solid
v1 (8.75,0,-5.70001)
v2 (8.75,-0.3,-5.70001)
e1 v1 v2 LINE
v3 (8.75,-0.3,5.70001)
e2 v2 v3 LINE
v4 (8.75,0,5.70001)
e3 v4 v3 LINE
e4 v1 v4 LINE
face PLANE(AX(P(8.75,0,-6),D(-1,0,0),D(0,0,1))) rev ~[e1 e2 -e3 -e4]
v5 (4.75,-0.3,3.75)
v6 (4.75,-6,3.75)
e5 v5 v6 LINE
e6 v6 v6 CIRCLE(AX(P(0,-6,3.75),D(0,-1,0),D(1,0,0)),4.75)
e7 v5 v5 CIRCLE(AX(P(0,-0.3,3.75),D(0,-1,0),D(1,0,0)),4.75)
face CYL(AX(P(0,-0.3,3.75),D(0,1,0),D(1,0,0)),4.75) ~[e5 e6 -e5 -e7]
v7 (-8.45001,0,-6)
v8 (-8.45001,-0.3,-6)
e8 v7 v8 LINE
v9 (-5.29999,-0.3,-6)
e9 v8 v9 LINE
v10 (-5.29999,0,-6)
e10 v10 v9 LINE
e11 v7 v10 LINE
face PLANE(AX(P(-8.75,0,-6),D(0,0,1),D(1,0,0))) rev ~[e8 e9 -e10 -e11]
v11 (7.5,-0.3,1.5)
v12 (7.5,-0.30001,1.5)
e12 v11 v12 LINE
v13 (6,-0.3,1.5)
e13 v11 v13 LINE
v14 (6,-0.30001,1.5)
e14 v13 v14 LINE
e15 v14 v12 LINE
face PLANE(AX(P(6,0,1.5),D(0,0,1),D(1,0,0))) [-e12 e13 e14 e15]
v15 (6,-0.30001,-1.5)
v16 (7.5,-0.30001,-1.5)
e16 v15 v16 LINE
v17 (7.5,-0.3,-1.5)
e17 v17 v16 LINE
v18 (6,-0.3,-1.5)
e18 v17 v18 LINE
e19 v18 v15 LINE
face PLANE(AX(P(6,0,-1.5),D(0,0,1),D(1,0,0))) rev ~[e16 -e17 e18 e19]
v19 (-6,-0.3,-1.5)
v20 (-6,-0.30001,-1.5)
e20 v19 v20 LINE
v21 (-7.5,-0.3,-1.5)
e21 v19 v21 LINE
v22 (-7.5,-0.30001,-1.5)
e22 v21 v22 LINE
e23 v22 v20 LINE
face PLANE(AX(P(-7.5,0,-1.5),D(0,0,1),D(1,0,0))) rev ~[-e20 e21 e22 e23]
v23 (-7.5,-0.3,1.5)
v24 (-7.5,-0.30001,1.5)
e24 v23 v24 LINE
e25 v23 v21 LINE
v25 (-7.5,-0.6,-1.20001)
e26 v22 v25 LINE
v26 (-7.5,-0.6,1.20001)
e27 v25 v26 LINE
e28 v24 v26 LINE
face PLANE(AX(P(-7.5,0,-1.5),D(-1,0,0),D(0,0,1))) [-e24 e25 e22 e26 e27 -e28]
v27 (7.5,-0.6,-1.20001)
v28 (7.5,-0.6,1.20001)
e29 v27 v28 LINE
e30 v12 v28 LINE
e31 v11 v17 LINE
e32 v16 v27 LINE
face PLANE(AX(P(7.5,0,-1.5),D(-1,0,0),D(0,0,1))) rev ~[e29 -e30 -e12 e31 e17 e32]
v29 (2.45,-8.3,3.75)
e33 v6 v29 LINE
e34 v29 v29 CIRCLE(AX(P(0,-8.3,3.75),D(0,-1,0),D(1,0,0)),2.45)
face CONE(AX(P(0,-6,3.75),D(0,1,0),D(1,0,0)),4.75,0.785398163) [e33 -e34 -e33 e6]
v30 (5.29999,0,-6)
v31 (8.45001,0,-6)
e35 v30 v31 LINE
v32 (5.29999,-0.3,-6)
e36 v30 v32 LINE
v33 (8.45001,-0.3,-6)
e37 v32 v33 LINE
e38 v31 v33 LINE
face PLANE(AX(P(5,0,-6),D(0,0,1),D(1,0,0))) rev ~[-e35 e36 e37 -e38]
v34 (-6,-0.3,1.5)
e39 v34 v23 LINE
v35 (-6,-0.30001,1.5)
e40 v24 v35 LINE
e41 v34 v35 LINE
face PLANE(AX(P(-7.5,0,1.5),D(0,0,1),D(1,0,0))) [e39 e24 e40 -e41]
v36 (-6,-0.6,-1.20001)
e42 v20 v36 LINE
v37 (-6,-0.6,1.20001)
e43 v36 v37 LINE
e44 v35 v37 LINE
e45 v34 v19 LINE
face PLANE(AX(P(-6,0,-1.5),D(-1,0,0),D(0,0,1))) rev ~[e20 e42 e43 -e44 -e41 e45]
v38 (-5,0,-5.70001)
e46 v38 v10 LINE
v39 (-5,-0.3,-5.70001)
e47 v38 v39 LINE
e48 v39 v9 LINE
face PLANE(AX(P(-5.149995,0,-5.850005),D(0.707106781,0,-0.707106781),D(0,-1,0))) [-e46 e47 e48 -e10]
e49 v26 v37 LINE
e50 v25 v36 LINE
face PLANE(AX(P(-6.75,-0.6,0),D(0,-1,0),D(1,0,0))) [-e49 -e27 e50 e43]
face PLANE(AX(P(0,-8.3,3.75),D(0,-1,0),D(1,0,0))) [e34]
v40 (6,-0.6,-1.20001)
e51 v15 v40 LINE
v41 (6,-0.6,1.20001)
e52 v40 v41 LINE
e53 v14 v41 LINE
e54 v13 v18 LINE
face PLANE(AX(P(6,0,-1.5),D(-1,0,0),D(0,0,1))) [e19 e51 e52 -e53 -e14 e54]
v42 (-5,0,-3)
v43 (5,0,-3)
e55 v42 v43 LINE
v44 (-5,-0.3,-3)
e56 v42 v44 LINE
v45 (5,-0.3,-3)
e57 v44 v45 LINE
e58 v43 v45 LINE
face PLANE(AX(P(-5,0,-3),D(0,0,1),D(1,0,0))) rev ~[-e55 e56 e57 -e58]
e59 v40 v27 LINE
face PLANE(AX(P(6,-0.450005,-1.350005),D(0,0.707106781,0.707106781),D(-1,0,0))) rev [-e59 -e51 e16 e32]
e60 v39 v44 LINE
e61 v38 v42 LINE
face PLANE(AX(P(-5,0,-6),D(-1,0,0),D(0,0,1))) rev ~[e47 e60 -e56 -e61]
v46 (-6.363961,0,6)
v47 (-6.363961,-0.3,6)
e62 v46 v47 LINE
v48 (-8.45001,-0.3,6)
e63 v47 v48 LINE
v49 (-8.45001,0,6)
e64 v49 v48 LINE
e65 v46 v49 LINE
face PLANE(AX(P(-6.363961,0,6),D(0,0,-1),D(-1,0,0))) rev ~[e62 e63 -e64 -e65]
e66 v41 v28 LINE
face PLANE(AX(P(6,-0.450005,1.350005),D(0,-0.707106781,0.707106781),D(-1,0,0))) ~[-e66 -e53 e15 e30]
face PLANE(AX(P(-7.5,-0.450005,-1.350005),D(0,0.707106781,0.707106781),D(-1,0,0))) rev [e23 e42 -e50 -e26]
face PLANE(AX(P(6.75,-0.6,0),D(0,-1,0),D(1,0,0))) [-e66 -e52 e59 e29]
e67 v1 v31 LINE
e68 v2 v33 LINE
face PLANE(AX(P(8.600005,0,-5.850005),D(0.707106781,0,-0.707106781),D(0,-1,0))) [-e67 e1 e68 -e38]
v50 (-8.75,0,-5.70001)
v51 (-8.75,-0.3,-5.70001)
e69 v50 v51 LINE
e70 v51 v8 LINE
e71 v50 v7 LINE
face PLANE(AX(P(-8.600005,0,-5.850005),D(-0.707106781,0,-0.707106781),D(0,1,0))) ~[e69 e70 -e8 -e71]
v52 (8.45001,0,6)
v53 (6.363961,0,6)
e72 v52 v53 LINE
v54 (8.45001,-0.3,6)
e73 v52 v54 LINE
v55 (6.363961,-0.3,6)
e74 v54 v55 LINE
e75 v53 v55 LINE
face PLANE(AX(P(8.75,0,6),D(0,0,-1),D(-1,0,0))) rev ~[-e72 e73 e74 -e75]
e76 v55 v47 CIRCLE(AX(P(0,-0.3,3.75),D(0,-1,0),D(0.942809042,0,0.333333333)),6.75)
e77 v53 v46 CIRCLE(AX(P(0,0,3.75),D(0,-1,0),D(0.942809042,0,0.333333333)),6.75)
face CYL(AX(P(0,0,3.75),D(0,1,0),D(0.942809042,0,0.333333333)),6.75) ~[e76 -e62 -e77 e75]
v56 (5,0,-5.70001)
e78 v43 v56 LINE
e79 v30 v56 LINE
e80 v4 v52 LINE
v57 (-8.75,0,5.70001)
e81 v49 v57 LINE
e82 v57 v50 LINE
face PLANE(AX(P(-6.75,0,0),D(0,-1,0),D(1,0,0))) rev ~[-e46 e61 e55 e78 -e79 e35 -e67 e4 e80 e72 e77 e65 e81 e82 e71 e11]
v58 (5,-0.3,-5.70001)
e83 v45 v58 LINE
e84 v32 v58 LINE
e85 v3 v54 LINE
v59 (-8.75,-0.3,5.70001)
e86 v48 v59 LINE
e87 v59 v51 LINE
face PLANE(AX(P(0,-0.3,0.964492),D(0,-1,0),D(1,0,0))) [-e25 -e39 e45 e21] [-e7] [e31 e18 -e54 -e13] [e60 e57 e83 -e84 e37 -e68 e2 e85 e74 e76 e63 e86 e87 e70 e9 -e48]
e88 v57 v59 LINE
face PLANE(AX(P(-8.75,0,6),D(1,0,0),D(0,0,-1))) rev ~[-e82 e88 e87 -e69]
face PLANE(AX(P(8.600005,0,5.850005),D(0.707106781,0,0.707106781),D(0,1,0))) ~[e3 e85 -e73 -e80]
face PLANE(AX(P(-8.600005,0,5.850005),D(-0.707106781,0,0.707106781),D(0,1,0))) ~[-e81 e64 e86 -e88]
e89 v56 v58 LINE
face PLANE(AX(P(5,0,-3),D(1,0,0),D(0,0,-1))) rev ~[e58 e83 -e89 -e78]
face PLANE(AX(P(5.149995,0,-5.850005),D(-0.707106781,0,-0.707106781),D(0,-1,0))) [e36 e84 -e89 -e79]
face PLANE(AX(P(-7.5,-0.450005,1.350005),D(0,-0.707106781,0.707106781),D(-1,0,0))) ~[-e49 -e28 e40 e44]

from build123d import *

# Parameters (mm, degrees)
F0_W     = 1.5
F0_H     = 3
F1_DEPTH = 0.3
F2_DEPTH = 0.6
F3_R     = 4.75
F4_DEPTH = 8
F5_SIZE  = 2.3
F6_SIZE  = 0.29999


# Not quite as in the source:
# - a fillet or chamfer is up to 0.001 mm smaller than in the source, because OpenCascade refuses the exact size


with BuildPart() as f1:
    # F0 (on Front) → F1 (new body)
    with BuildSketch(Plane.XZ):
        with BuildLine():
            Line((8.75, -6), (8.75, 6))
            Line((8.75, 6), (6.3639610307, 6))
            ThreePointArc((6.3639610307, 6), (0, 10.5), (-6.3639610307, 6))
            Line((-6.3639610307, 6), (-8.75, 6))
            Line((-8.75, 6), (-8.75, -6))
            Line((-8.75, -6), (-5, -6))
            Line((-5, -6), (-5, -3))
            Line((-5, -3), (5, -3))
            Line((5, -3), (5, -6))
            Line((5, -6), (8.75, -6))
        make_face()
        with Locations((-6.75, 0)):
            Rectangle(F0_W, F0_H, mode=Mode.SUBTRACT)
        with Locations((6.75, 0)):
            Rectangle(F0_W, F0_H, mode=Mode.SUBTRACT)
        with Locations((-6.75, 0)):
            Rectangle(F0_W, F0_H)
        with Locations((6.75, 0)):
            Rectangle(F0_W, F0_H)
    extrude(amount=F1_DEPTH)

    # F0 (on Front) → F2 (join)
    with BuildSketch(Plane.XZ):
        with Locations((-6.75, 0)):
            Rectangle(F0_W, F0_H)
        with Locations((6.75, 0)):
            Rectangle(F0_W, F0_H)
    extrude(amount=F2_DEPTH)

    # F3 (on face) → F4 (join)
    with BuildSketch(Plane.XZ.offset(0.3)):
        with Locations((0, 3.75)):
            Circle(F3_R)
    extrude(amount=F4_DEPTH)

    # F5
    f5_edges = [f1.edges().sort_by_distance(p)[0] for p in [
        (-4.75, -8.3, 3.75),
    ]]
    chamfer(f5_edges, length=F5_SIZE)

    # F6 (size 0.3 in the source; OpenCascade refuses exactly that, so slightly less here)
    f6_edges = [f1.edges().sort_by_distance(p)[0] for p in [
        (-6.75, -0.6, -1.5),
        (-6.75, -0.6, 1.5),
        (6.75, -0.6, -1.5),
        (6.75, -0.6, 1.5),
        (-5, -0.15, -6),
        (-8.75, -0.15, -6),
        (5, -0.15, -6),
        (8.75, -0.15, -6),
        (8.75, -0.15, 6),
        (-8.75, -0.15, 6),
    ]]
    chamfer(f6_edges, length=F6_SIZE)


solid = f1.part
